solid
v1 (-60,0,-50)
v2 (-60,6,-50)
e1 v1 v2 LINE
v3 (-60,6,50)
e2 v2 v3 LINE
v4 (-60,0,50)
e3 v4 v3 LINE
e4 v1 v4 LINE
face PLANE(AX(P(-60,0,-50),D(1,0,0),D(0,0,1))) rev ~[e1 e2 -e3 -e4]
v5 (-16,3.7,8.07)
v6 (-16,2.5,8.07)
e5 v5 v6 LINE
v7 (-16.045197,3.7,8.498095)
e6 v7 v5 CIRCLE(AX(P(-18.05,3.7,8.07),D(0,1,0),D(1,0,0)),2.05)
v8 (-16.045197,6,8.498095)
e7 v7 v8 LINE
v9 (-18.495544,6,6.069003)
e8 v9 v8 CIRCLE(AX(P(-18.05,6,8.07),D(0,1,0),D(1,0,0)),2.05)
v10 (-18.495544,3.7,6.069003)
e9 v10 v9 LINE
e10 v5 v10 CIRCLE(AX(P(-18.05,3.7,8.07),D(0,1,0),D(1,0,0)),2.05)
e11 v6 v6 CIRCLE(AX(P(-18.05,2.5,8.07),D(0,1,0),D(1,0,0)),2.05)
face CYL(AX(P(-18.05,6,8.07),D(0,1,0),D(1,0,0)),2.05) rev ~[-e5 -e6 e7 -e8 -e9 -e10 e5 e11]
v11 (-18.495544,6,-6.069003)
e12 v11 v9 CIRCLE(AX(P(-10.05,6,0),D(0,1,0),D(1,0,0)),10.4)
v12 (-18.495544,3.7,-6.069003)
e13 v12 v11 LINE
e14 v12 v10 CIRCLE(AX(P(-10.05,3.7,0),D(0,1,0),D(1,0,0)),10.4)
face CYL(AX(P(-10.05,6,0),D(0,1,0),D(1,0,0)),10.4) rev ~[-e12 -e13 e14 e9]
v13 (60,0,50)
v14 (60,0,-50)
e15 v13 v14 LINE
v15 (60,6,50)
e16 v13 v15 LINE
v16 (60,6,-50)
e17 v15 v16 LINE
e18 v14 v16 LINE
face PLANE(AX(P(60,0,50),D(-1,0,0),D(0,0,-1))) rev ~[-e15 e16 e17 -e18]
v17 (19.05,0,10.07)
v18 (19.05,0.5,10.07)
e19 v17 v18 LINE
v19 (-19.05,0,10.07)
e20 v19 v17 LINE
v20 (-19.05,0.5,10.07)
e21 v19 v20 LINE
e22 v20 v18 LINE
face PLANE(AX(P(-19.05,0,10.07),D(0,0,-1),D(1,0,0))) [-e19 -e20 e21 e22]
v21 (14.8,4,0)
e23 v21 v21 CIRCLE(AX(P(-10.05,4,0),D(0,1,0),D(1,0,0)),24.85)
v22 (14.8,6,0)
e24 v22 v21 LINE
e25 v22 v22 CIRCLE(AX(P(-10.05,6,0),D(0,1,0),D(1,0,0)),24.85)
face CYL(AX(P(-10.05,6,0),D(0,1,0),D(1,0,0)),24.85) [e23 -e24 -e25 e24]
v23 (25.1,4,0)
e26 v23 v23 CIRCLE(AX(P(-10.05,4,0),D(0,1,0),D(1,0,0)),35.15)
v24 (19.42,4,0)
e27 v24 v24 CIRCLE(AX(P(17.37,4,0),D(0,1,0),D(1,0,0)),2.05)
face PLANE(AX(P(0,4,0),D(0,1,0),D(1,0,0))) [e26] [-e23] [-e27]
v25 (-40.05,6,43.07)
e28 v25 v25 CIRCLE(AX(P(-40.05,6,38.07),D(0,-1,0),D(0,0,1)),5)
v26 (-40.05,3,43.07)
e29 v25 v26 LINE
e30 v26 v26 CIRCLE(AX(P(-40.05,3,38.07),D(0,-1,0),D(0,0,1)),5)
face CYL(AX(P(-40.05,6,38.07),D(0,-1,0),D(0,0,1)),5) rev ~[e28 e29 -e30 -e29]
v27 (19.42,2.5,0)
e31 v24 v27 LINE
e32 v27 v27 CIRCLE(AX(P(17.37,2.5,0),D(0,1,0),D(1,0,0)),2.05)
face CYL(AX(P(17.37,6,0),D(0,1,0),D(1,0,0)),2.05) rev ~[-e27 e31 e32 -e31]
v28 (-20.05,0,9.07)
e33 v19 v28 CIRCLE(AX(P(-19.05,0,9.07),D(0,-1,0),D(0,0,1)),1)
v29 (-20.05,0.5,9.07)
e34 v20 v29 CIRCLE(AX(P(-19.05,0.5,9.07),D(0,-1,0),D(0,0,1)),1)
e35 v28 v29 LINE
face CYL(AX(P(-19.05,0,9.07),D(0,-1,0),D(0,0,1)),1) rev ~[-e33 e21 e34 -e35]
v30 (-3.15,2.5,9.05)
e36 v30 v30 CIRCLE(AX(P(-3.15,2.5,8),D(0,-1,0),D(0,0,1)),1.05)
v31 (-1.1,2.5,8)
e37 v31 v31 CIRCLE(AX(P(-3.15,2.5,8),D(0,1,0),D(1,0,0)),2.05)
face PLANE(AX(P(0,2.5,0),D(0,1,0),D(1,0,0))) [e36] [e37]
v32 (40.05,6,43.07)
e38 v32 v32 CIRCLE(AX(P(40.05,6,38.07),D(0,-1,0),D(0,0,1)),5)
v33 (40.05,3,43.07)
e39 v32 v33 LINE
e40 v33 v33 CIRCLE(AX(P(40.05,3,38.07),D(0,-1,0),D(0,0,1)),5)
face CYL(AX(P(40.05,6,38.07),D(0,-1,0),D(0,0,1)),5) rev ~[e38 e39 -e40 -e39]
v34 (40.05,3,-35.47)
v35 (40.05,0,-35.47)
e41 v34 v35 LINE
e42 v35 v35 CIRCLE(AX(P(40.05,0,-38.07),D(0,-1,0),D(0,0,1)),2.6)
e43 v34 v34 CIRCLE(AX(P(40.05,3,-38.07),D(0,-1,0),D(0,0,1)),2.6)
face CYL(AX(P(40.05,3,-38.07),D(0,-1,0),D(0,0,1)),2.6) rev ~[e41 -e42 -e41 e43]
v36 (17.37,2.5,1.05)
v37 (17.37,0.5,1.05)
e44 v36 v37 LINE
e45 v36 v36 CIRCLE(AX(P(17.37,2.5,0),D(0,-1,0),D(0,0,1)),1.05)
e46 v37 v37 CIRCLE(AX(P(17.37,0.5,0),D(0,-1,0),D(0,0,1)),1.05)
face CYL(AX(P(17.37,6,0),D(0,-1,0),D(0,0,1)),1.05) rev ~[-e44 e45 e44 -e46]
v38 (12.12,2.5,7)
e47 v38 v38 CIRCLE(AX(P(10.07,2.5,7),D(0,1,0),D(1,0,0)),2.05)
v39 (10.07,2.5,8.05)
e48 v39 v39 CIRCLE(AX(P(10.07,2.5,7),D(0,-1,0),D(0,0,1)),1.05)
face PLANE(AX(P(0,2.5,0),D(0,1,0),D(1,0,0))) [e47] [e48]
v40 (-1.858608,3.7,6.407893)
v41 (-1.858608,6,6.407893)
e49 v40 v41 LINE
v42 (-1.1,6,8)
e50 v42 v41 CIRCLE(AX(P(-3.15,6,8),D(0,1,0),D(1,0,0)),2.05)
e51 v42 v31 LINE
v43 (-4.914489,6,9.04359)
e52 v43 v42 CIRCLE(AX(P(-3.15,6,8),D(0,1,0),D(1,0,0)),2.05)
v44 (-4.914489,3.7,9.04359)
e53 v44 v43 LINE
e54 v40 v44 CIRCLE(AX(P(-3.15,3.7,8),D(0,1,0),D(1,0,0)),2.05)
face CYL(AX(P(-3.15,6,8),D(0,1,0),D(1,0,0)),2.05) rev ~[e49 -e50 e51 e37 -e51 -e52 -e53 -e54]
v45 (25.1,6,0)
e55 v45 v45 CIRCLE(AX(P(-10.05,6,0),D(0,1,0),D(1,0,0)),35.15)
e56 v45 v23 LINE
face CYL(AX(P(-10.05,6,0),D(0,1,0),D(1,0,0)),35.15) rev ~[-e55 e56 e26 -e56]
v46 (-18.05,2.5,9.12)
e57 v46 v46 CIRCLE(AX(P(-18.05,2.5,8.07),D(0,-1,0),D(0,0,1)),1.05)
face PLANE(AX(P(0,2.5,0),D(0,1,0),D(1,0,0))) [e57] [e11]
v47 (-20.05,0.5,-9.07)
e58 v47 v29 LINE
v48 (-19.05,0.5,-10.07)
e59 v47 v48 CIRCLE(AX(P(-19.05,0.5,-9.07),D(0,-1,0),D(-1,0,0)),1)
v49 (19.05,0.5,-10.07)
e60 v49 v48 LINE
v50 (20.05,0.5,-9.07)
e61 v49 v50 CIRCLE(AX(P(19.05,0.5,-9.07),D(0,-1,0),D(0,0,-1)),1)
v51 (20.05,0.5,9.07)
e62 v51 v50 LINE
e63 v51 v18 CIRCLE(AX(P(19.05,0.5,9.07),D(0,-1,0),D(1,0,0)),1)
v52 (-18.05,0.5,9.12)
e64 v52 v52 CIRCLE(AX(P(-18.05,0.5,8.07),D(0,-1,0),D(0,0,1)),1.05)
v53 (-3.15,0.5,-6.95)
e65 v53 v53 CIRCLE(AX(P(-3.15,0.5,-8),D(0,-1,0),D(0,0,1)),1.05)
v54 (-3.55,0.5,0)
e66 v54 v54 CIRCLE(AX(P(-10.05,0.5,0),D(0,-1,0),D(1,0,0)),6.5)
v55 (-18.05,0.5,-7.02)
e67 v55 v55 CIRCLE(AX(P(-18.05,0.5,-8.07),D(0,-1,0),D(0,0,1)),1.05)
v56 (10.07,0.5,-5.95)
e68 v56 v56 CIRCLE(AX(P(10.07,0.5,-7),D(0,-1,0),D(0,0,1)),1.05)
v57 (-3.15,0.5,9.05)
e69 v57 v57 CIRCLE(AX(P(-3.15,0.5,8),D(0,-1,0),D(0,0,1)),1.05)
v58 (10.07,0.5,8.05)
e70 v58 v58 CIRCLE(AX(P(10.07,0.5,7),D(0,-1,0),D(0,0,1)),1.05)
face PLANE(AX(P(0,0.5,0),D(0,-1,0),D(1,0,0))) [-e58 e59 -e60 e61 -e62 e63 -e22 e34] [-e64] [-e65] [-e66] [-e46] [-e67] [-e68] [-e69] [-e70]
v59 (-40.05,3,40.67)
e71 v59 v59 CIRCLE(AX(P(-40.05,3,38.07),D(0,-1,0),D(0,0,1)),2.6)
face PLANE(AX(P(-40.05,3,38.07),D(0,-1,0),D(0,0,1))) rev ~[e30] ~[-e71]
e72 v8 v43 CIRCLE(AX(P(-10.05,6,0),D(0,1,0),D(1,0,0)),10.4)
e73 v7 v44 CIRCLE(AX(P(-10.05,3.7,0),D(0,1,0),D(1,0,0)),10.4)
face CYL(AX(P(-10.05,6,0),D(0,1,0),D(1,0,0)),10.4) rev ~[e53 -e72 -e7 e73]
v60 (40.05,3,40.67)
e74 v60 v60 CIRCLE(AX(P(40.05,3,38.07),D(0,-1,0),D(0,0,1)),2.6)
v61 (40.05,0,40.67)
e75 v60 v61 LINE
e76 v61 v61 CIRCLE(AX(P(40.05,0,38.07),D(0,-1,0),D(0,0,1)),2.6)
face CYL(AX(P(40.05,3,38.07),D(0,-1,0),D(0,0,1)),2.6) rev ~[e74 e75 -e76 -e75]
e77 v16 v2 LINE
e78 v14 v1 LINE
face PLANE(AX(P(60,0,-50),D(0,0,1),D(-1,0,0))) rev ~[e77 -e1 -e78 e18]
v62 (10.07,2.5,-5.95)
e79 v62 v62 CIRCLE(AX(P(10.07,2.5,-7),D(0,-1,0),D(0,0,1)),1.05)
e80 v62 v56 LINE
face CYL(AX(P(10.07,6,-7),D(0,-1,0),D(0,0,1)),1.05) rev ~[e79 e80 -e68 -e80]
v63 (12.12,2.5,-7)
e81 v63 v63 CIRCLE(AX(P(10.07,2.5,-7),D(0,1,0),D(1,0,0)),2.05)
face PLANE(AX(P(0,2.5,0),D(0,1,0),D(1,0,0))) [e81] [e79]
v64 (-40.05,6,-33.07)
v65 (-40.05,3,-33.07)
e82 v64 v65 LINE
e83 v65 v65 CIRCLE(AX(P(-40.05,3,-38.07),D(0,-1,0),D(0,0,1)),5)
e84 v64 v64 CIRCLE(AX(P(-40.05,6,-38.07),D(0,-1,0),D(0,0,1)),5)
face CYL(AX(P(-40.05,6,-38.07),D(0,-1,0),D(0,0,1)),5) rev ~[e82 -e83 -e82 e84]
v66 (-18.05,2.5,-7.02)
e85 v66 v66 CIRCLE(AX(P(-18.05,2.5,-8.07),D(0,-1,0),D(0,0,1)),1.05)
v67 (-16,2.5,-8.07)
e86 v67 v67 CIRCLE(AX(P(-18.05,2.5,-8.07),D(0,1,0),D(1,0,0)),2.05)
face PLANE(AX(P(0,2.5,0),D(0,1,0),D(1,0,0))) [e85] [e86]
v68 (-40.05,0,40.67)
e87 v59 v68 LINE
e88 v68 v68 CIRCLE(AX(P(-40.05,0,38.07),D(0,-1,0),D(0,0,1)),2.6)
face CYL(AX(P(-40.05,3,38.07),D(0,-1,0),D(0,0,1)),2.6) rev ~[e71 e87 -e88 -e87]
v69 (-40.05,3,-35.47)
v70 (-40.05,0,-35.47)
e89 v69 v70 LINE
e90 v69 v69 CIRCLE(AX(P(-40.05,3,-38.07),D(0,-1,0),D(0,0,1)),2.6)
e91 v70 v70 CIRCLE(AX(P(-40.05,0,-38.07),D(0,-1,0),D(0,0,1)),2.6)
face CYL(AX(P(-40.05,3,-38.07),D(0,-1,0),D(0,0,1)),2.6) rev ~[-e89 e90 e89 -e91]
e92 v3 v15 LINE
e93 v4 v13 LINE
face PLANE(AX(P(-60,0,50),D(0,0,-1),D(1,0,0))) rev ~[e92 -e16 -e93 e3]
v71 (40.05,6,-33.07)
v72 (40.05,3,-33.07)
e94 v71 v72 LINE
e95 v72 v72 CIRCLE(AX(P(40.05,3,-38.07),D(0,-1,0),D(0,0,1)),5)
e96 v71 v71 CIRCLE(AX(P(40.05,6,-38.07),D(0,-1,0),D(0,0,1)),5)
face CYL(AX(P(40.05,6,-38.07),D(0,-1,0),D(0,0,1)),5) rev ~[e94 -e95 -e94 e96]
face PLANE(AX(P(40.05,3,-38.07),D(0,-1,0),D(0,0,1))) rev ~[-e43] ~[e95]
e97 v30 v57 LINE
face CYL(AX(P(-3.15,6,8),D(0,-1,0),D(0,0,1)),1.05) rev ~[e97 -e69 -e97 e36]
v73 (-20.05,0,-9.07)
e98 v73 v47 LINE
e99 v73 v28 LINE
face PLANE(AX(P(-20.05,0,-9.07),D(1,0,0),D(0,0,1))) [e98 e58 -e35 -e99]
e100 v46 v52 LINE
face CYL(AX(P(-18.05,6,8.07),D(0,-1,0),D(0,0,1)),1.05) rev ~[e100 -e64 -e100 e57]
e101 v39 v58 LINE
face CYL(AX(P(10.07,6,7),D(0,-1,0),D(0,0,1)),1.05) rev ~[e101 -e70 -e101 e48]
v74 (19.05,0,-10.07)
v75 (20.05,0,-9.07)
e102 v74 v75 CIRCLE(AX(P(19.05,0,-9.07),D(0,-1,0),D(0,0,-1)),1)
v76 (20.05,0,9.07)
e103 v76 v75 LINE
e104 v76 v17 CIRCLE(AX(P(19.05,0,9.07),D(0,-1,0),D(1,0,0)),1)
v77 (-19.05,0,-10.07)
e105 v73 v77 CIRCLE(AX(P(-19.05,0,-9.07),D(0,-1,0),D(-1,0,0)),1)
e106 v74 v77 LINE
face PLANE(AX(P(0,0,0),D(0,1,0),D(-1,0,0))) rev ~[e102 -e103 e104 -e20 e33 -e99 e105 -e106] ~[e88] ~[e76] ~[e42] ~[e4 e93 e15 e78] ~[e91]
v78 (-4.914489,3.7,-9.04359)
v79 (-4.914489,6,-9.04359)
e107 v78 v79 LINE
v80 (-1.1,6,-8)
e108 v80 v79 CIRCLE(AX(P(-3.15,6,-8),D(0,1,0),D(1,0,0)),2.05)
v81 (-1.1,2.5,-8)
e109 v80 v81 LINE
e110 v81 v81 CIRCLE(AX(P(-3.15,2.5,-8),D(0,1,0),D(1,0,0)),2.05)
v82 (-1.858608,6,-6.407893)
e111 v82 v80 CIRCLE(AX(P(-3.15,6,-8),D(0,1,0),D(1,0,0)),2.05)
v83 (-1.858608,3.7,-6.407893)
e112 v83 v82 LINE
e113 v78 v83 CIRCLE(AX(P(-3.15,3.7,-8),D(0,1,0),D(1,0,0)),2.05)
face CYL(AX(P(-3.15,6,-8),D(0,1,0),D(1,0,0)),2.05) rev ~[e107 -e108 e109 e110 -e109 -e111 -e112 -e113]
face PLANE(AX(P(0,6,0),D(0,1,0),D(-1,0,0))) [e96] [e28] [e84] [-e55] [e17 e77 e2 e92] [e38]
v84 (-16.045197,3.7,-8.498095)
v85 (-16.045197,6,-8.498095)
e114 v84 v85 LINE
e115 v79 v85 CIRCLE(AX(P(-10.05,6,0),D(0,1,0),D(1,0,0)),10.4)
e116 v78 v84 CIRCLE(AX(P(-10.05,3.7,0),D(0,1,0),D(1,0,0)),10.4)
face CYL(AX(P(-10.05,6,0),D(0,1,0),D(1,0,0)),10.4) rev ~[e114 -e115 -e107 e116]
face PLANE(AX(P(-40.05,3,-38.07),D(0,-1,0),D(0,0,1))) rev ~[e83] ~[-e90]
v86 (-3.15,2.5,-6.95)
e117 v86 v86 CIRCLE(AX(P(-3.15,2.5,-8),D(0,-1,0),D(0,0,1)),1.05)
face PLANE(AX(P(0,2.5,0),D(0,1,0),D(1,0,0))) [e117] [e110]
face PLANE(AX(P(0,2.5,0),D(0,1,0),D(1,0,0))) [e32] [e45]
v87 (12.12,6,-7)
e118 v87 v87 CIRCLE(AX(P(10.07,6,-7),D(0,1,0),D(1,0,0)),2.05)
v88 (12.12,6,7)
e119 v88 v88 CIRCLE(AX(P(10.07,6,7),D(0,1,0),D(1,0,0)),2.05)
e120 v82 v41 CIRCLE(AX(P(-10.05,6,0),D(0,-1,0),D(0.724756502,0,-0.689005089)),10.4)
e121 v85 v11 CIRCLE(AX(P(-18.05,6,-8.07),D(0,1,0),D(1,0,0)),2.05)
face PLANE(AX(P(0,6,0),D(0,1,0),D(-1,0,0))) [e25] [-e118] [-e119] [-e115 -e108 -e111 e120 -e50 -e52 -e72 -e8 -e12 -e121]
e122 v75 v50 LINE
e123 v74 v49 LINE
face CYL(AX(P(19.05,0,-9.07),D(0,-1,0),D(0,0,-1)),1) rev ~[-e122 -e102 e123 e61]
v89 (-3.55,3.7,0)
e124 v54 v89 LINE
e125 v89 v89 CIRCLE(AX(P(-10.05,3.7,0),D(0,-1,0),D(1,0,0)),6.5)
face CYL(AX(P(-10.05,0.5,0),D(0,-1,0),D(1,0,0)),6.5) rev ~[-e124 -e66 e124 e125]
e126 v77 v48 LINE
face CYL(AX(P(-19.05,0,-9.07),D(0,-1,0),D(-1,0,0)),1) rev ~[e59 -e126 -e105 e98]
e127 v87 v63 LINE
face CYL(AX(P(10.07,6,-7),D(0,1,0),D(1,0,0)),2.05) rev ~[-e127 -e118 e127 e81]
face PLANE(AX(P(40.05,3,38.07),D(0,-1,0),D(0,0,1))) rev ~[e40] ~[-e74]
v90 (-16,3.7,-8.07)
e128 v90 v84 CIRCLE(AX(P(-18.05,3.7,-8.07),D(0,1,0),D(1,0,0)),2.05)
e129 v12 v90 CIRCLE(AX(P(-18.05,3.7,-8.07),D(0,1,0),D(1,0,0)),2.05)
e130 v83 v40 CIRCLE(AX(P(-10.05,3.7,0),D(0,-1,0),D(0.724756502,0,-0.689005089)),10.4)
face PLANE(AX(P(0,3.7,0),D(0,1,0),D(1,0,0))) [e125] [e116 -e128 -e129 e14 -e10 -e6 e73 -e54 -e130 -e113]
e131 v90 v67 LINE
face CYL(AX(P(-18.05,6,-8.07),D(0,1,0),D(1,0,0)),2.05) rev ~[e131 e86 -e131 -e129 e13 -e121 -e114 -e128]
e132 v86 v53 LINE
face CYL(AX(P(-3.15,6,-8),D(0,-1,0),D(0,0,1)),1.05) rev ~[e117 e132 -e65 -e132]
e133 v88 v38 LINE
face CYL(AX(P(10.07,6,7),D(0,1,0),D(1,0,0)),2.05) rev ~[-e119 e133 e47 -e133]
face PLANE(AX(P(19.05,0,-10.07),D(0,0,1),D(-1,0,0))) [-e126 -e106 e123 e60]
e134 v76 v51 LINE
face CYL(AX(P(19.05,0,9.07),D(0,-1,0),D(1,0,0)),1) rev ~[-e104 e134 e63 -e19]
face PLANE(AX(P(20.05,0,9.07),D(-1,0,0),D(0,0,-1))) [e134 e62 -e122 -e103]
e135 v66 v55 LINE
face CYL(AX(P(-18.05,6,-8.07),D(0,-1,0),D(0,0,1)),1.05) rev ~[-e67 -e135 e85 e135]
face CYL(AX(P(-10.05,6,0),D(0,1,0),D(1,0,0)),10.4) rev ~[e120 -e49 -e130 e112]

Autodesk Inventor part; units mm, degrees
ref_plane "YZ Plane" through (0, 0, 0) normal (1, 0, 0) x (0, 1, 0)
ref_plane "XZ Plane" through (0, 0, 0) normal (0, 1, 0) x (-1, 0, 0)
ref_plane "XY Plane" through (0, 0, 0) normal (0, 0, 1) x (1, 0, 0)
sketch "Sketch1" plane through (0, 0, 0) normal (0, 1, 0) x (-1, 0, 0)
  line L0 (60, 50) -> (-60, 50)
  line L1 (-60, 50) -> (-60, -50)
  line L2 (-60, -50) -> (60, -50)
  line L3 (60, -50) -> (60, 50)
  line L4 (60, 50) -> (-60, -50) construction
  line L5 (-60, 50) -> (60, -50) construction
  point P0 (0, 0)
  dimension "d0" = 120
  dimension "d1" = 100
extrude "Extrusion1" add sketch "Sketch1" along normal blind 6
sketch "Sketch5" plane through (0, 6, 0) normal (0, 1, 0) x (1, 0, 0)
  circle A0 centre (-10.05, 0) radius 1.2295 projected
  circle A1 centre (-10.05, 0) radius 10.4
  point P0 (0, 0)
  dimension "d16" = 20.8
extrude "Extrusion3" cut sketch "Sketch5" against normal blind 2.3 contours A0 | A1
hole "Hole1" at (-18.05, 6, -8.07) at (-18.05, 6, 8.07) at (-3.15, 6, 8) at (-3.15, 6, -8) at (10.07, 6, 7) at (17.37, 6, 0) at (10.07, 6, -7) direction (0, -1, 0) diameter 2.1 end through all
sketch "Sketch8" plane through (0, 6, 0) normal (0, 1, 0) x (1, 0, 0)
  arc A0 (-17.650182, -7.0991) -> (-17.08262, -7.661739) centre (-18.05, -8.07) ccw
  arc A1 (-17.08262, 7.661739) -> (-17.650182, 7.0991) centre (-18.05, 8.07) ccw
  arc A2 (-4.068914, -8.508032) -> (-2.512532, -7.165653) centre (-3.15, -8) ccw
  arc A3 (-2.512532, 7.165653) -> (-4.068914, 8.508032) centre (-3.15, 8) ccw
  circle A4 centre (10.07, -7) radius 1.05
  circle A5 centre (17.37, 0) radius 1.05
  circle A6 centre (10.07, 7) radius 1.05
  circle A7 centre (-18.05, -8.07) radius 2.05
  circle A8 centre (-18.05, 8.07) radius 2.05
  circle A9 centre (-3.15, -8) radius 2.05
  circle A10 centre (-3.15, 8) radius 2.05
  circle A11 centre (10.07, 7) radius 2.05
  circle A12 centre (10.07, -7) radius 2.05
  circle A13 centre (17.37, 0) radius 2.05
  point P0 (0, 0)
  dimension "d31" = 4.1
extrude "Extrusion6" cut sketch "Sketch8" against normal blind 3.5 contours A4 | A5 | A6 | A7 | A8 | A9 | A10 | A11 | A12 | A13
sketch "Sketch11" plane through (0, 6, 0) normal (0, 1, 0) x (1, 0, 0)
  circle A0 centre (-10.05, 0) radius 25 projected
  circle A1 centre (-10.05, 0) radius 35 projected
  circle A2 centre (-10.05, 0) radius 24.85
  circle A3 centre (-10.05, 0) radius 35.15
  point P0 (0, 0)
  dimension "d38" = 0.15
  dimension "d39" = 0.15
sketch "Sketch11 outline for Extrusion9" plane through (0, 6, 0) normal (0, 1, 0) x (1, 0, 0)
  circle A0 centre (-10.05, 0) radius 35.15
  circle A1 centre (-10.05, 0) radius 24.85
extrude "Extrusion9" cut sketch "Sketch11 outline for Extrusion9" against normal blind 2
sketch "Sketch12" plane through (0, 6, 0) normal (0, 1, 0) x (1, 0, 0)
  line L0 (-44.2, 50.07) -> (-44.2, -50.07) construction
  line L1 (-35.9, 50.07) -> (-35.9, -50.07) construction
  line L2 (35.9, 50.07) -> (35.9, -50.07) construction
  line L3 (44.2, 50.07) -> (44.2, -50.07) construction
  line L4 (60, 50) -> (-60, 50) projected
  line L5 (-40.05, -50.07) -> (-40.05, 50) construction
  line L6 (40.05, -50.07) -> (40.05, 50) construction
  line L7 (-44.2, -50.07) -> (-35.9, -50.07) construction
  line L8 (35.9, -50.07) -> (44.2, -50.07) construction
  line L9 (-60, 50) -> (-60, -50) projected
  line L10 (60, -50) -> (60, 50) projected
  line L11 (-60, 0) -> (60, 0) construction
  point P0 (0, 0)
  point P1 (-40.05, -38.07)
  point P2 (40.05, -38.07)
  point P3 (-40.05, 38.07)
  point P4 (40.05, 38.07)
  dimension "d42" = 12
hole "Hole2" at (-40.05, 6, 38.07) at (40.05, 6, 38.07) at (-40.05, 6, -38.07) at (40.05, 6, -38.07) direction (0, -1, 0) diameter 5.2 end through all counterbore diameter 10 counterbore depth 3
sketch "Sketch13" plane through (0, 0, 0) normal (0, -1, 0) x (1, 0, 0)
  circle A0 centre (-10.05, 0) radius 35.15 projected
  line L0 (-19.05, 10.07) -> (19.05, 10.07)
  line L1 (20.05, 9.07) -> (20.05, -9.07)
  line L2 (19.05, -10.07) -> (-19.05, -10.07)
  line L3 (-20.05, -9.07) -> (-20.05, 9.07)
  arc A1 (-19.05, 10.07) -> (-20.05, 9.07) centre (-19.05, 9.07) ccw
  arc A2 (20.05, 9.07) -> (19.05, 10.07) centre (19.05, 9.07) ccw
  arc A3 (19.05, -10.07) -> (20.05, -9.07) centre (19.05, -9.07) ccw
  arc A4 (-20.05, -9.07) -> (-19.05, -10.07) centre (-19.05, -9.07) ccw
  point P0 (0, 0)
  point P1 (20.05, -10.07)
  point P2 (20.05, 10.07)
  point P3 (-20.05, -10.07)
  point P4 (-20.05, 0)
  dimension "d50" = 40.1
  dimension "d51" = 20.14
  dimension "d52" = 10
  dimension "d53" = 1
extrude "Extrusion10" cut sketch "Sketch13" against normal blind 0.5 contours L0 A2 L1 A3 L2 A4 L3 A1
sketch "Sketch14" plane through (0, 0.5, 0) normal (0, -1, 0) x (1, 0, 0)
  circle A0 centre (-10.05, 0) radius 24.85 projected
  circle A1 centre (-10.05, 0) radius 6.5
  point P0 (0, 0)
  dimension "d56" = 13
extrude "Extrusion11" cut sketch "Sketch14" against normal through all contours A1
properties part number "axis_1_top_frame" material "Aluminum 6061-AHC"
